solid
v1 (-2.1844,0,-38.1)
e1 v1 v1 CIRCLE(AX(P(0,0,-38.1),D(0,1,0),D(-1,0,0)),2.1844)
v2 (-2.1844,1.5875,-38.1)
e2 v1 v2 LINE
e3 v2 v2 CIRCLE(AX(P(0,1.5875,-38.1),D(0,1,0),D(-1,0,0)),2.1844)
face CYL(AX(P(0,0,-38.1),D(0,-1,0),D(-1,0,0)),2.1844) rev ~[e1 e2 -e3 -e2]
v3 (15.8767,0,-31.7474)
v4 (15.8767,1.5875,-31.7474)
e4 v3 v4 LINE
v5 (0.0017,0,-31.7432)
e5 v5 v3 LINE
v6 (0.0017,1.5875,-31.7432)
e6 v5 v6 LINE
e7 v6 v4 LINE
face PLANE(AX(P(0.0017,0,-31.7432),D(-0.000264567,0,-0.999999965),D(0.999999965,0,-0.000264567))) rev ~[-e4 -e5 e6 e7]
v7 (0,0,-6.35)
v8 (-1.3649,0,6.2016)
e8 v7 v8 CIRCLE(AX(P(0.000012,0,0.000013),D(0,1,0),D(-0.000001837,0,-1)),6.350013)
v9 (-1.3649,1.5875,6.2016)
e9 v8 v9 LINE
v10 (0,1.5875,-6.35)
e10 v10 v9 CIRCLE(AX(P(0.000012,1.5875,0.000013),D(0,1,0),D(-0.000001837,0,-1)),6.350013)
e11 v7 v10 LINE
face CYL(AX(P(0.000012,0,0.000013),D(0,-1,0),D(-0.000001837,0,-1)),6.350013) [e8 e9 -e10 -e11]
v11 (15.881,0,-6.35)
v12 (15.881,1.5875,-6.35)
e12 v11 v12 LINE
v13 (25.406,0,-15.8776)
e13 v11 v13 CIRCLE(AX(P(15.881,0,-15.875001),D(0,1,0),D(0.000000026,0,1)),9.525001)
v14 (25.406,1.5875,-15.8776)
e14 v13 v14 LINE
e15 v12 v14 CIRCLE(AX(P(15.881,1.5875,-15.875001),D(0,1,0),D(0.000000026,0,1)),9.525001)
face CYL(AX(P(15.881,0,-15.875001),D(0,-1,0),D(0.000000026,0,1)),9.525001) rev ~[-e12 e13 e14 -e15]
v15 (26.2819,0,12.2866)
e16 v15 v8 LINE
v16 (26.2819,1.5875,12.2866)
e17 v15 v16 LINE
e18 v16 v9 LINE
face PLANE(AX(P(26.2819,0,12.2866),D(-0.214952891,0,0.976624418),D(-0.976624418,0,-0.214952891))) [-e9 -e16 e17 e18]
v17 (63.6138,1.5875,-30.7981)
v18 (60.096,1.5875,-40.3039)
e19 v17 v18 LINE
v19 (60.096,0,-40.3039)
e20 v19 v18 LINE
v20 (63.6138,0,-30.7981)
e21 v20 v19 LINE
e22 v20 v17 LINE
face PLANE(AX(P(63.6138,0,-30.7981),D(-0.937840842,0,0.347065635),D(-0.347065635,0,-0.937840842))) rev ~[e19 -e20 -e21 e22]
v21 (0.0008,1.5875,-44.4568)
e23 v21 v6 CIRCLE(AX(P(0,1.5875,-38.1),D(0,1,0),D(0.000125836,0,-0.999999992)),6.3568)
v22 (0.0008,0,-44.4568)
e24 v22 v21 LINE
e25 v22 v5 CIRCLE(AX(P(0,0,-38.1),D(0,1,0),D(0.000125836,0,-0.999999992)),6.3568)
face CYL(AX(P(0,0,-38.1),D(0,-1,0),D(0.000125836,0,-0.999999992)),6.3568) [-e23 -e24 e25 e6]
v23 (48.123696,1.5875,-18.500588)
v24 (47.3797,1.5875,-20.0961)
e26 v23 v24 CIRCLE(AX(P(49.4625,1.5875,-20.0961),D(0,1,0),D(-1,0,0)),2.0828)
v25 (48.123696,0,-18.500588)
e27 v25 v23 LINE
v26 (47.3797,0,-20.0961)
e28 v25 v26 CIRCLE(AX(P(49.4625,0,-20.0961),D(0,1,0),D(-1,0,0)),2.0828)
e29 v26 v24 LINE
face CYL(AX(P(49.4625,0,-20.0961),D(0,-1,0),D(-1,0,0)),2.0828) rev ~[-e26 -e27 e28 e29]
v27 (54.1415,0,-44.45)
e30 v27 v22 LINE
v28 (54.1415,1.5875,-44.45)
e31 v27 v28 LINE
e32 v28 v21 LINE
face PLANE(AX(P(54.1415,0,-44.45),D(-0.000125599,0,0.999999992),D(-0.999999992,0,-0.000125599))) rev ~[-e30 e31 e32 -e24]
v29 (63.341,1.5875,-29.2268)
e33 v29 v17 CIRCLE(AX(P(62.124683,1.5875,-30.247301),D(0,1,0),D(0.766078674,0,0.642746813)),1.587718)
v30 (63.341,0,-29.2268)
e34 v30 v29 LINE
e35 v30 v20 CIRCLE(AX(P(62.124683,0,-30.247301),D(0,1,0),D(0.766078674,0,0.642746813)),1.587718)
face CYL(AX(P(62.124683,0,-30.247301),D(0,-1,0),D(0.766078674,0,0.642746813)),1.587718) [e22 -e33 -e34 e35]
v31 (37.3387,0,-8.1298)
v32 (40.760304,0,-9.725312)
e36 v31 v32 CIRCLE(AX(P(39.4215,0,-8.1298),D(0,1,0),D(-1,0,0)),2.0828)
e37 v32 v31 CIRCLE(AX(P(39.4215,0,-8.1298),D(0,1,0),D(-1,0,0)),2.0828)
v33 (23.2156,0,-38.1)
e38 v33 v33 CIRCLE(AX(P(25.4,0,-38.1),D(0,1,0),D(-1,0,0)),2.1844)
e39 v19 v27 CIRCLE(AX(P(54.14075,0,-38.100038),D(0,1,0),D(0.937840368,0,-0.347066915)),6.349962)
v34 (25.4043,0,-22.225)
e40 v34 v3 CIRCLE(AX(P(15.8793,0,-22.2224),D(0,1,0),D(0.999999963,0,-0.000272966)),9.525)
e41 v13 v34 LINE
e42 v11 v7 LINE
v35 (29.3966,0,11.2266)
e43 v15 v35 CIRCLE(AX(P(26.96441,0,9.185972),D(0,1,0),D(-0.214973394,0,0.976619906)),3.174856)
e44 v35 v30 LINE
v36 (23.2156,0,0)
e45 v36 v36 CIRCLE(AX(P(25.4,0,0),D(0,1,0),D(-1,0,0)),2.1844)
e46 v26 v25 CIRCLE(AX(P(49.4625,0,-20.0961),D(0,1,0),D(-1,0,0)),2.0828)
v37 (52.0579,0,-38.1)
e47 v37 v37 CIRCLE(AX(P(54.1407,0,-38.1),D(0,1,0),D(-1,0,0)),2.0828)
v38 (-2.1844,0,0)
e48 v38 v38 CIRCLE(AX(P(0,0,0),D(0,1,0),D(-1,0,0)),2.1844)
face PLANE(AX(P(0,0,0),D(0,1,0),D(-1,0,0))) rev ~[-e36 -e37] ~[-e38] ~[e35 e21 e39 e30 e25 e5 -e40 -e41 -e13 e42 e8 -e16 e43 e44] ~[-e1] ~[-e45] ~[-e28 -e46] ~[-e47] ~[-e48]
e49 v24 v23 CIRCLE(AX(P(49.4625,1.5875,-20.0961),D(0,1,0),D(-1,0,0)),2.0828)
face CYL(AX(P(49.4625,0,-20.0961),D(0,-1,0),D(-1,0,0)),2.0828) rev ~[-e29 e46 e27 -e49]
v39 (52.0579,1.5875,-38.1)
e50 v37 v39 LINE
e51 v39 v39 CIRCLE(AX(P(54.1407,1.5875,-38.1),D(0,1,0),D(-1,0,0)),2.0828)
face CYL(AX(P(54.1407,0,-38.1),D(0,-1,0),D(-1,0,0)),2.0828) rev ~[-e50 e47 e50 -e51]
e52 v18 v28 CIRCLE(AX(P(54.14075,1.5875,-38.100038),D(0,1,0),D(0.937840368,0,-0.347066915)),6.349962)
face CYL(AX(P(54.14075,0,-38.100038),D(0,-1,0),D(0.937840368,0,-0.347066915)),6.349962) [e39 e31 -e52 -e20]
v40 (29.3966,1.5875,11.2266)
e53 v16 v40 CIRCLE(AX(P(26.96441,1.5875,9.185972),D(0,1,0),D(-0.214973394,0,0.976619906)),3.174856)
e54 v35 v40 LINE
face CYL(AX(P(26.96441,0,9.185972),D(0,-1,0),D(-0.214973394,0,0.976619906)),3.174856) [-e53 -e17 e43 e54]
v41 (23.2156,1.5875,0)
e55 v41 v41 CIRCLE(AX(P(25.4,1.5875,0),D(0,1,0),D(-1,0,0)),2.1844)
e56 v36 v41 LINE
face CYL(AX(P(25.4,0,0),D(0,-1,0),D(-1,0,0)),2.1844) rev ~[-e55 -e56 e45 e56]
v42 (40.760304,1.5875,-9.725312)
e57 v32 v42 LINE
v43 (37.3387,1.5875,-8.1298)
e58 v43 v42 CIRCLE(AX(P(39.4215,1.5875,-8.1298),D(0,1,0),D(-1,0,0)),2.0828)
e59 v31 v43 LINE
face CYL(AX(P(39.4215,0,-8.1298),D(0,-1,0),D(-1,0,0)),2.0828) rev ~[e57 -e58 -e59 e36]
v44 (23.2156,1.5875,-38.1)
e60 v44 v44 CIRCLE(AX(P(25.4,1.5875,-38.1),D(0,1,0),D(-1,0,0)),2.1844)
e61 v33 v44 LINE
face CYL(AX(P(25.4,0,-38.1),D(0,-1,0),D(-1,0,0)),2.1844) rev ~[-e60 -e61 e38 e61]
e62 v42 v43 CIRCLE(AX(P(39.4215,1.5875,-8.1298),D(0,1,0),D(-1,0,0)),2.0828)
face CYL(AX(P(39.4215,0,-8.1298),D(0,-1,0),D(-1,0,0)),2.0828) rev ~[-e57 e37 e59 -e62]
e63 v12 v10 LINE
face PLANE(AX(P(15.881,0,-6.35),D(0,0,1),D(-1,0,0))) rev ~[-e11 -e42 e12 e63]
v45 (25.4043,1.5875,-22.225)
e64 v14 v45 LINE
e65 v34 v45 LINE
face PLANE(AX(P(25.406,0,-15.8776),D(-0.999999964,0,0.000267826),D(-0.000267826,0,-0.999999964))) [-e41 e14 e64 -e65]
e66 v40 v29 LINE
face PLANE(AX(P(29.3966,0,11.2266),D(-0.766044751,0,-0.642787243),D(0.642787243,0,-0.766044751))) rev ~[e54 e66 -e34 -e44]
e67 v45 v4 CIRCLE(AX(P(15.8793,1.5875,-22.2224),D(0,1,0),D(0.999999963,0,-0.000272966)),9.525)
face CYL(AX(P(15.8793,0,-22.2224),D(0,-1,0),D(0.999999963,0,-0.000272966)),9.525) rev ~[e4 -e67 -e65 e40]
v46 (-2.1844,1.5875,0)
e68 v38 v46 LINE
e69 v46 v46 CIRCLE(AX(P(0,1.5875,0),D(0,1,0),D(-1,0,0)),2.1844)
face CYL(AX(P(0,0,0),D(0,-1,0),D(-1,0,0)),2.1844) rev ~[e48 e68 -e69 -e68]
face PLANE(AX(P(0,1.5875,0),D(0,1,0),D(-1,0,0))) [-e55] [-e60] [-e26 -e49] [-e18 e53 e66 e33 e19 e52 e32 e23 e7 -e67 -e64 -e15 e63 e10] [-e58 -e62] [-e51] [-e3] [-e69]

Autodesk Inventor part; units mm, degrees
ref_plane "YZ Plane" through (0, 0, 0) normal (1, 0, 0) x (0, 1, 0)
ref_plane "XZ Plane" through (0, 0, 0) normal (0, 1, 0) x (-1, 0, 0)
ref_plane "XY Plane" through (0, 0, 0) normal (0, 0, 1) x (1, 0, 0)
sketch "main" plane through (0, 0, 0) normal (0, 0, 1) x (1, 0, 0)
  circle A0 centre (-18.8876, -3.9215) radius 2.0828
  arc A1 (-24.8429, -6.1253) -> (-18.8884, -10.2715) centre (-18.8876, -3.9215) ccw
  line L0 (5.8565, 45.4052) -> (-28.0879, 4.9518)
  circle A2 centre (9.8531, -3.9215) radius 2.1844
  line L1 (-18.8884, -10.2715) -> (35.2523, -10.2783)
  line L2 (9.8472, 18.301) -> (9.8489, 11.9535)
  arc A3 (9.8489, 11.9535) -> (19.3764, 2.4311) centre (19.3739, 11.9561) ccw
  circle A4 centre (9.8531, 34.1785) radius 2.1844
  line L3 (35.2514, 2.4354) -> (19.3764, 2.4311)
  arc A5 (35.2523, -10.2783) -> (35.2514, 2.4354) centre (35.2531, -3.9215) ccw
  circle A6 centre (35.2531, 34.1785) radius 2.1844
  arc A7 (35.2531, 27.8285) -> (36.6181, 40.3801) centre (35.2531, 34.1785) ccw
  circle A8 centre (35.2531, -3.9215) radius 2.1844
  line L4 (-28.3606, 3.3804) -> (-24.8429, -6.1253)
  line L5 (19.3722, 27.8285) -> (35.2531, 27.8285)
  arc A9 (19.3722, 27.8285) -> (9.8472, 18.301) centre (19.3722, 18.3035) ccw
  circle A10 centre (-14.2094, 14.0824) radius 2.0828
  arc A11 (-28.0879, 4.9518) -> (-28.3606, 3.3804) centre (-26.8718, 3.9314) ccw
  circle A12 centre (-4.1684, 26.0488) radius 2.0828
  line L6 (-4.1684, 26.0488) -> (-14.2094, 14.0824)
  line L7 (8.9712, 46.4651) -> (36.6181, 40.3801)
  arc A13 (8.9712, 46.4651) -> (5.8565, 45.4052) centre (8.2887, 43.3643) ccw
  point P0 (9.379, 13.4106)
  point P1 (9.8514, 2.4285)
  point P2 (9.8446, 27.8285)
  dimension "d0" = 4.1656
  dimension "d1" = 12.7
  dimension "d6" = 9.525
  dimension "d8" = 4.1656
  dimension "d9" = 1.5875
  dimension "d14" = 4.1656
  dimension "d15" = 15.621
  dimension "d17" = 3.175
sketch "Sketch1" plane through (0, 0, 0) normal (0, 1, 0) x (-1, 0, 0)
  circle A0 centre (-54.1407, -38.1) radius 2.0828
  arc A1 (-60.096, -40.3039) -> (-54.1415, -44.45) centre (-54.1407, -38.1) ccw
  line L0 (-29.3966, 11.2266) -> (-63.341, -29.2268)
  circle A2 centre (-25.4, -38.1) radius 2.1844
  line L1 (-54.1415, -44.45) -> (-0.0008, -44.4568)
  line L2 (-25.406, -15.8776) -> (-25.4043, -22.225)
  arc A3 (-25.4043, -22.225) -> (-15.8767, -31.7474) centre (-15.8793, -22.2224) ccw
  circle A4 centre (-25.4, 0) radius 2.1844
  line L3 (-0.0017, -31.7432) -> (-15.8767, -31.7474)
  arc A5 (-0.0008, -44.4568) -> (-0.0017, -31.7432) centre (0, -38.1) ccw
  circle A6 centre (0, 0) radius 2.1844
  arc A7 (0, -6.35) -> (1.3649, 6.2016) centre (0, 0) ccw
  circle A8 centre (0, -38.1) radius 2.1844
  line L4 (-63.6138, -30.7981) -> (-60.096, -40.3039)
  line L5 (-15.881, -6.35) -> (0, -6.35)
  arc A9 (-15.881, -6.35) -> (-25.406, -15.8776) centre (-15.881, -15.875) ccw
  circle A10 centre (-49.4625, -20.0961) radius 2.0828
  arc A11 (-63.341, -29.2268) -> (-63.6138, -30.7981) centre (-62.1249, -30.2472) ccw
  circle A12 centre (-39.4215, -8.1298) radius 2.0828
  line L6 (-39.4215, -8.1298) -> (-49.4625, -20.0961)
  line L7 (-26.2819, 12.2866) -> (1.3649, 6.2016)
  arc A13 (-26.2819, 12.2866) -> (-29.3966, 11.2266) centre (-26.9644, 9.1858) ccw
extrude "Extrusion1" add sketch "Sketch1" along normal blind 1.5875
properties part number "funel_gusset"
